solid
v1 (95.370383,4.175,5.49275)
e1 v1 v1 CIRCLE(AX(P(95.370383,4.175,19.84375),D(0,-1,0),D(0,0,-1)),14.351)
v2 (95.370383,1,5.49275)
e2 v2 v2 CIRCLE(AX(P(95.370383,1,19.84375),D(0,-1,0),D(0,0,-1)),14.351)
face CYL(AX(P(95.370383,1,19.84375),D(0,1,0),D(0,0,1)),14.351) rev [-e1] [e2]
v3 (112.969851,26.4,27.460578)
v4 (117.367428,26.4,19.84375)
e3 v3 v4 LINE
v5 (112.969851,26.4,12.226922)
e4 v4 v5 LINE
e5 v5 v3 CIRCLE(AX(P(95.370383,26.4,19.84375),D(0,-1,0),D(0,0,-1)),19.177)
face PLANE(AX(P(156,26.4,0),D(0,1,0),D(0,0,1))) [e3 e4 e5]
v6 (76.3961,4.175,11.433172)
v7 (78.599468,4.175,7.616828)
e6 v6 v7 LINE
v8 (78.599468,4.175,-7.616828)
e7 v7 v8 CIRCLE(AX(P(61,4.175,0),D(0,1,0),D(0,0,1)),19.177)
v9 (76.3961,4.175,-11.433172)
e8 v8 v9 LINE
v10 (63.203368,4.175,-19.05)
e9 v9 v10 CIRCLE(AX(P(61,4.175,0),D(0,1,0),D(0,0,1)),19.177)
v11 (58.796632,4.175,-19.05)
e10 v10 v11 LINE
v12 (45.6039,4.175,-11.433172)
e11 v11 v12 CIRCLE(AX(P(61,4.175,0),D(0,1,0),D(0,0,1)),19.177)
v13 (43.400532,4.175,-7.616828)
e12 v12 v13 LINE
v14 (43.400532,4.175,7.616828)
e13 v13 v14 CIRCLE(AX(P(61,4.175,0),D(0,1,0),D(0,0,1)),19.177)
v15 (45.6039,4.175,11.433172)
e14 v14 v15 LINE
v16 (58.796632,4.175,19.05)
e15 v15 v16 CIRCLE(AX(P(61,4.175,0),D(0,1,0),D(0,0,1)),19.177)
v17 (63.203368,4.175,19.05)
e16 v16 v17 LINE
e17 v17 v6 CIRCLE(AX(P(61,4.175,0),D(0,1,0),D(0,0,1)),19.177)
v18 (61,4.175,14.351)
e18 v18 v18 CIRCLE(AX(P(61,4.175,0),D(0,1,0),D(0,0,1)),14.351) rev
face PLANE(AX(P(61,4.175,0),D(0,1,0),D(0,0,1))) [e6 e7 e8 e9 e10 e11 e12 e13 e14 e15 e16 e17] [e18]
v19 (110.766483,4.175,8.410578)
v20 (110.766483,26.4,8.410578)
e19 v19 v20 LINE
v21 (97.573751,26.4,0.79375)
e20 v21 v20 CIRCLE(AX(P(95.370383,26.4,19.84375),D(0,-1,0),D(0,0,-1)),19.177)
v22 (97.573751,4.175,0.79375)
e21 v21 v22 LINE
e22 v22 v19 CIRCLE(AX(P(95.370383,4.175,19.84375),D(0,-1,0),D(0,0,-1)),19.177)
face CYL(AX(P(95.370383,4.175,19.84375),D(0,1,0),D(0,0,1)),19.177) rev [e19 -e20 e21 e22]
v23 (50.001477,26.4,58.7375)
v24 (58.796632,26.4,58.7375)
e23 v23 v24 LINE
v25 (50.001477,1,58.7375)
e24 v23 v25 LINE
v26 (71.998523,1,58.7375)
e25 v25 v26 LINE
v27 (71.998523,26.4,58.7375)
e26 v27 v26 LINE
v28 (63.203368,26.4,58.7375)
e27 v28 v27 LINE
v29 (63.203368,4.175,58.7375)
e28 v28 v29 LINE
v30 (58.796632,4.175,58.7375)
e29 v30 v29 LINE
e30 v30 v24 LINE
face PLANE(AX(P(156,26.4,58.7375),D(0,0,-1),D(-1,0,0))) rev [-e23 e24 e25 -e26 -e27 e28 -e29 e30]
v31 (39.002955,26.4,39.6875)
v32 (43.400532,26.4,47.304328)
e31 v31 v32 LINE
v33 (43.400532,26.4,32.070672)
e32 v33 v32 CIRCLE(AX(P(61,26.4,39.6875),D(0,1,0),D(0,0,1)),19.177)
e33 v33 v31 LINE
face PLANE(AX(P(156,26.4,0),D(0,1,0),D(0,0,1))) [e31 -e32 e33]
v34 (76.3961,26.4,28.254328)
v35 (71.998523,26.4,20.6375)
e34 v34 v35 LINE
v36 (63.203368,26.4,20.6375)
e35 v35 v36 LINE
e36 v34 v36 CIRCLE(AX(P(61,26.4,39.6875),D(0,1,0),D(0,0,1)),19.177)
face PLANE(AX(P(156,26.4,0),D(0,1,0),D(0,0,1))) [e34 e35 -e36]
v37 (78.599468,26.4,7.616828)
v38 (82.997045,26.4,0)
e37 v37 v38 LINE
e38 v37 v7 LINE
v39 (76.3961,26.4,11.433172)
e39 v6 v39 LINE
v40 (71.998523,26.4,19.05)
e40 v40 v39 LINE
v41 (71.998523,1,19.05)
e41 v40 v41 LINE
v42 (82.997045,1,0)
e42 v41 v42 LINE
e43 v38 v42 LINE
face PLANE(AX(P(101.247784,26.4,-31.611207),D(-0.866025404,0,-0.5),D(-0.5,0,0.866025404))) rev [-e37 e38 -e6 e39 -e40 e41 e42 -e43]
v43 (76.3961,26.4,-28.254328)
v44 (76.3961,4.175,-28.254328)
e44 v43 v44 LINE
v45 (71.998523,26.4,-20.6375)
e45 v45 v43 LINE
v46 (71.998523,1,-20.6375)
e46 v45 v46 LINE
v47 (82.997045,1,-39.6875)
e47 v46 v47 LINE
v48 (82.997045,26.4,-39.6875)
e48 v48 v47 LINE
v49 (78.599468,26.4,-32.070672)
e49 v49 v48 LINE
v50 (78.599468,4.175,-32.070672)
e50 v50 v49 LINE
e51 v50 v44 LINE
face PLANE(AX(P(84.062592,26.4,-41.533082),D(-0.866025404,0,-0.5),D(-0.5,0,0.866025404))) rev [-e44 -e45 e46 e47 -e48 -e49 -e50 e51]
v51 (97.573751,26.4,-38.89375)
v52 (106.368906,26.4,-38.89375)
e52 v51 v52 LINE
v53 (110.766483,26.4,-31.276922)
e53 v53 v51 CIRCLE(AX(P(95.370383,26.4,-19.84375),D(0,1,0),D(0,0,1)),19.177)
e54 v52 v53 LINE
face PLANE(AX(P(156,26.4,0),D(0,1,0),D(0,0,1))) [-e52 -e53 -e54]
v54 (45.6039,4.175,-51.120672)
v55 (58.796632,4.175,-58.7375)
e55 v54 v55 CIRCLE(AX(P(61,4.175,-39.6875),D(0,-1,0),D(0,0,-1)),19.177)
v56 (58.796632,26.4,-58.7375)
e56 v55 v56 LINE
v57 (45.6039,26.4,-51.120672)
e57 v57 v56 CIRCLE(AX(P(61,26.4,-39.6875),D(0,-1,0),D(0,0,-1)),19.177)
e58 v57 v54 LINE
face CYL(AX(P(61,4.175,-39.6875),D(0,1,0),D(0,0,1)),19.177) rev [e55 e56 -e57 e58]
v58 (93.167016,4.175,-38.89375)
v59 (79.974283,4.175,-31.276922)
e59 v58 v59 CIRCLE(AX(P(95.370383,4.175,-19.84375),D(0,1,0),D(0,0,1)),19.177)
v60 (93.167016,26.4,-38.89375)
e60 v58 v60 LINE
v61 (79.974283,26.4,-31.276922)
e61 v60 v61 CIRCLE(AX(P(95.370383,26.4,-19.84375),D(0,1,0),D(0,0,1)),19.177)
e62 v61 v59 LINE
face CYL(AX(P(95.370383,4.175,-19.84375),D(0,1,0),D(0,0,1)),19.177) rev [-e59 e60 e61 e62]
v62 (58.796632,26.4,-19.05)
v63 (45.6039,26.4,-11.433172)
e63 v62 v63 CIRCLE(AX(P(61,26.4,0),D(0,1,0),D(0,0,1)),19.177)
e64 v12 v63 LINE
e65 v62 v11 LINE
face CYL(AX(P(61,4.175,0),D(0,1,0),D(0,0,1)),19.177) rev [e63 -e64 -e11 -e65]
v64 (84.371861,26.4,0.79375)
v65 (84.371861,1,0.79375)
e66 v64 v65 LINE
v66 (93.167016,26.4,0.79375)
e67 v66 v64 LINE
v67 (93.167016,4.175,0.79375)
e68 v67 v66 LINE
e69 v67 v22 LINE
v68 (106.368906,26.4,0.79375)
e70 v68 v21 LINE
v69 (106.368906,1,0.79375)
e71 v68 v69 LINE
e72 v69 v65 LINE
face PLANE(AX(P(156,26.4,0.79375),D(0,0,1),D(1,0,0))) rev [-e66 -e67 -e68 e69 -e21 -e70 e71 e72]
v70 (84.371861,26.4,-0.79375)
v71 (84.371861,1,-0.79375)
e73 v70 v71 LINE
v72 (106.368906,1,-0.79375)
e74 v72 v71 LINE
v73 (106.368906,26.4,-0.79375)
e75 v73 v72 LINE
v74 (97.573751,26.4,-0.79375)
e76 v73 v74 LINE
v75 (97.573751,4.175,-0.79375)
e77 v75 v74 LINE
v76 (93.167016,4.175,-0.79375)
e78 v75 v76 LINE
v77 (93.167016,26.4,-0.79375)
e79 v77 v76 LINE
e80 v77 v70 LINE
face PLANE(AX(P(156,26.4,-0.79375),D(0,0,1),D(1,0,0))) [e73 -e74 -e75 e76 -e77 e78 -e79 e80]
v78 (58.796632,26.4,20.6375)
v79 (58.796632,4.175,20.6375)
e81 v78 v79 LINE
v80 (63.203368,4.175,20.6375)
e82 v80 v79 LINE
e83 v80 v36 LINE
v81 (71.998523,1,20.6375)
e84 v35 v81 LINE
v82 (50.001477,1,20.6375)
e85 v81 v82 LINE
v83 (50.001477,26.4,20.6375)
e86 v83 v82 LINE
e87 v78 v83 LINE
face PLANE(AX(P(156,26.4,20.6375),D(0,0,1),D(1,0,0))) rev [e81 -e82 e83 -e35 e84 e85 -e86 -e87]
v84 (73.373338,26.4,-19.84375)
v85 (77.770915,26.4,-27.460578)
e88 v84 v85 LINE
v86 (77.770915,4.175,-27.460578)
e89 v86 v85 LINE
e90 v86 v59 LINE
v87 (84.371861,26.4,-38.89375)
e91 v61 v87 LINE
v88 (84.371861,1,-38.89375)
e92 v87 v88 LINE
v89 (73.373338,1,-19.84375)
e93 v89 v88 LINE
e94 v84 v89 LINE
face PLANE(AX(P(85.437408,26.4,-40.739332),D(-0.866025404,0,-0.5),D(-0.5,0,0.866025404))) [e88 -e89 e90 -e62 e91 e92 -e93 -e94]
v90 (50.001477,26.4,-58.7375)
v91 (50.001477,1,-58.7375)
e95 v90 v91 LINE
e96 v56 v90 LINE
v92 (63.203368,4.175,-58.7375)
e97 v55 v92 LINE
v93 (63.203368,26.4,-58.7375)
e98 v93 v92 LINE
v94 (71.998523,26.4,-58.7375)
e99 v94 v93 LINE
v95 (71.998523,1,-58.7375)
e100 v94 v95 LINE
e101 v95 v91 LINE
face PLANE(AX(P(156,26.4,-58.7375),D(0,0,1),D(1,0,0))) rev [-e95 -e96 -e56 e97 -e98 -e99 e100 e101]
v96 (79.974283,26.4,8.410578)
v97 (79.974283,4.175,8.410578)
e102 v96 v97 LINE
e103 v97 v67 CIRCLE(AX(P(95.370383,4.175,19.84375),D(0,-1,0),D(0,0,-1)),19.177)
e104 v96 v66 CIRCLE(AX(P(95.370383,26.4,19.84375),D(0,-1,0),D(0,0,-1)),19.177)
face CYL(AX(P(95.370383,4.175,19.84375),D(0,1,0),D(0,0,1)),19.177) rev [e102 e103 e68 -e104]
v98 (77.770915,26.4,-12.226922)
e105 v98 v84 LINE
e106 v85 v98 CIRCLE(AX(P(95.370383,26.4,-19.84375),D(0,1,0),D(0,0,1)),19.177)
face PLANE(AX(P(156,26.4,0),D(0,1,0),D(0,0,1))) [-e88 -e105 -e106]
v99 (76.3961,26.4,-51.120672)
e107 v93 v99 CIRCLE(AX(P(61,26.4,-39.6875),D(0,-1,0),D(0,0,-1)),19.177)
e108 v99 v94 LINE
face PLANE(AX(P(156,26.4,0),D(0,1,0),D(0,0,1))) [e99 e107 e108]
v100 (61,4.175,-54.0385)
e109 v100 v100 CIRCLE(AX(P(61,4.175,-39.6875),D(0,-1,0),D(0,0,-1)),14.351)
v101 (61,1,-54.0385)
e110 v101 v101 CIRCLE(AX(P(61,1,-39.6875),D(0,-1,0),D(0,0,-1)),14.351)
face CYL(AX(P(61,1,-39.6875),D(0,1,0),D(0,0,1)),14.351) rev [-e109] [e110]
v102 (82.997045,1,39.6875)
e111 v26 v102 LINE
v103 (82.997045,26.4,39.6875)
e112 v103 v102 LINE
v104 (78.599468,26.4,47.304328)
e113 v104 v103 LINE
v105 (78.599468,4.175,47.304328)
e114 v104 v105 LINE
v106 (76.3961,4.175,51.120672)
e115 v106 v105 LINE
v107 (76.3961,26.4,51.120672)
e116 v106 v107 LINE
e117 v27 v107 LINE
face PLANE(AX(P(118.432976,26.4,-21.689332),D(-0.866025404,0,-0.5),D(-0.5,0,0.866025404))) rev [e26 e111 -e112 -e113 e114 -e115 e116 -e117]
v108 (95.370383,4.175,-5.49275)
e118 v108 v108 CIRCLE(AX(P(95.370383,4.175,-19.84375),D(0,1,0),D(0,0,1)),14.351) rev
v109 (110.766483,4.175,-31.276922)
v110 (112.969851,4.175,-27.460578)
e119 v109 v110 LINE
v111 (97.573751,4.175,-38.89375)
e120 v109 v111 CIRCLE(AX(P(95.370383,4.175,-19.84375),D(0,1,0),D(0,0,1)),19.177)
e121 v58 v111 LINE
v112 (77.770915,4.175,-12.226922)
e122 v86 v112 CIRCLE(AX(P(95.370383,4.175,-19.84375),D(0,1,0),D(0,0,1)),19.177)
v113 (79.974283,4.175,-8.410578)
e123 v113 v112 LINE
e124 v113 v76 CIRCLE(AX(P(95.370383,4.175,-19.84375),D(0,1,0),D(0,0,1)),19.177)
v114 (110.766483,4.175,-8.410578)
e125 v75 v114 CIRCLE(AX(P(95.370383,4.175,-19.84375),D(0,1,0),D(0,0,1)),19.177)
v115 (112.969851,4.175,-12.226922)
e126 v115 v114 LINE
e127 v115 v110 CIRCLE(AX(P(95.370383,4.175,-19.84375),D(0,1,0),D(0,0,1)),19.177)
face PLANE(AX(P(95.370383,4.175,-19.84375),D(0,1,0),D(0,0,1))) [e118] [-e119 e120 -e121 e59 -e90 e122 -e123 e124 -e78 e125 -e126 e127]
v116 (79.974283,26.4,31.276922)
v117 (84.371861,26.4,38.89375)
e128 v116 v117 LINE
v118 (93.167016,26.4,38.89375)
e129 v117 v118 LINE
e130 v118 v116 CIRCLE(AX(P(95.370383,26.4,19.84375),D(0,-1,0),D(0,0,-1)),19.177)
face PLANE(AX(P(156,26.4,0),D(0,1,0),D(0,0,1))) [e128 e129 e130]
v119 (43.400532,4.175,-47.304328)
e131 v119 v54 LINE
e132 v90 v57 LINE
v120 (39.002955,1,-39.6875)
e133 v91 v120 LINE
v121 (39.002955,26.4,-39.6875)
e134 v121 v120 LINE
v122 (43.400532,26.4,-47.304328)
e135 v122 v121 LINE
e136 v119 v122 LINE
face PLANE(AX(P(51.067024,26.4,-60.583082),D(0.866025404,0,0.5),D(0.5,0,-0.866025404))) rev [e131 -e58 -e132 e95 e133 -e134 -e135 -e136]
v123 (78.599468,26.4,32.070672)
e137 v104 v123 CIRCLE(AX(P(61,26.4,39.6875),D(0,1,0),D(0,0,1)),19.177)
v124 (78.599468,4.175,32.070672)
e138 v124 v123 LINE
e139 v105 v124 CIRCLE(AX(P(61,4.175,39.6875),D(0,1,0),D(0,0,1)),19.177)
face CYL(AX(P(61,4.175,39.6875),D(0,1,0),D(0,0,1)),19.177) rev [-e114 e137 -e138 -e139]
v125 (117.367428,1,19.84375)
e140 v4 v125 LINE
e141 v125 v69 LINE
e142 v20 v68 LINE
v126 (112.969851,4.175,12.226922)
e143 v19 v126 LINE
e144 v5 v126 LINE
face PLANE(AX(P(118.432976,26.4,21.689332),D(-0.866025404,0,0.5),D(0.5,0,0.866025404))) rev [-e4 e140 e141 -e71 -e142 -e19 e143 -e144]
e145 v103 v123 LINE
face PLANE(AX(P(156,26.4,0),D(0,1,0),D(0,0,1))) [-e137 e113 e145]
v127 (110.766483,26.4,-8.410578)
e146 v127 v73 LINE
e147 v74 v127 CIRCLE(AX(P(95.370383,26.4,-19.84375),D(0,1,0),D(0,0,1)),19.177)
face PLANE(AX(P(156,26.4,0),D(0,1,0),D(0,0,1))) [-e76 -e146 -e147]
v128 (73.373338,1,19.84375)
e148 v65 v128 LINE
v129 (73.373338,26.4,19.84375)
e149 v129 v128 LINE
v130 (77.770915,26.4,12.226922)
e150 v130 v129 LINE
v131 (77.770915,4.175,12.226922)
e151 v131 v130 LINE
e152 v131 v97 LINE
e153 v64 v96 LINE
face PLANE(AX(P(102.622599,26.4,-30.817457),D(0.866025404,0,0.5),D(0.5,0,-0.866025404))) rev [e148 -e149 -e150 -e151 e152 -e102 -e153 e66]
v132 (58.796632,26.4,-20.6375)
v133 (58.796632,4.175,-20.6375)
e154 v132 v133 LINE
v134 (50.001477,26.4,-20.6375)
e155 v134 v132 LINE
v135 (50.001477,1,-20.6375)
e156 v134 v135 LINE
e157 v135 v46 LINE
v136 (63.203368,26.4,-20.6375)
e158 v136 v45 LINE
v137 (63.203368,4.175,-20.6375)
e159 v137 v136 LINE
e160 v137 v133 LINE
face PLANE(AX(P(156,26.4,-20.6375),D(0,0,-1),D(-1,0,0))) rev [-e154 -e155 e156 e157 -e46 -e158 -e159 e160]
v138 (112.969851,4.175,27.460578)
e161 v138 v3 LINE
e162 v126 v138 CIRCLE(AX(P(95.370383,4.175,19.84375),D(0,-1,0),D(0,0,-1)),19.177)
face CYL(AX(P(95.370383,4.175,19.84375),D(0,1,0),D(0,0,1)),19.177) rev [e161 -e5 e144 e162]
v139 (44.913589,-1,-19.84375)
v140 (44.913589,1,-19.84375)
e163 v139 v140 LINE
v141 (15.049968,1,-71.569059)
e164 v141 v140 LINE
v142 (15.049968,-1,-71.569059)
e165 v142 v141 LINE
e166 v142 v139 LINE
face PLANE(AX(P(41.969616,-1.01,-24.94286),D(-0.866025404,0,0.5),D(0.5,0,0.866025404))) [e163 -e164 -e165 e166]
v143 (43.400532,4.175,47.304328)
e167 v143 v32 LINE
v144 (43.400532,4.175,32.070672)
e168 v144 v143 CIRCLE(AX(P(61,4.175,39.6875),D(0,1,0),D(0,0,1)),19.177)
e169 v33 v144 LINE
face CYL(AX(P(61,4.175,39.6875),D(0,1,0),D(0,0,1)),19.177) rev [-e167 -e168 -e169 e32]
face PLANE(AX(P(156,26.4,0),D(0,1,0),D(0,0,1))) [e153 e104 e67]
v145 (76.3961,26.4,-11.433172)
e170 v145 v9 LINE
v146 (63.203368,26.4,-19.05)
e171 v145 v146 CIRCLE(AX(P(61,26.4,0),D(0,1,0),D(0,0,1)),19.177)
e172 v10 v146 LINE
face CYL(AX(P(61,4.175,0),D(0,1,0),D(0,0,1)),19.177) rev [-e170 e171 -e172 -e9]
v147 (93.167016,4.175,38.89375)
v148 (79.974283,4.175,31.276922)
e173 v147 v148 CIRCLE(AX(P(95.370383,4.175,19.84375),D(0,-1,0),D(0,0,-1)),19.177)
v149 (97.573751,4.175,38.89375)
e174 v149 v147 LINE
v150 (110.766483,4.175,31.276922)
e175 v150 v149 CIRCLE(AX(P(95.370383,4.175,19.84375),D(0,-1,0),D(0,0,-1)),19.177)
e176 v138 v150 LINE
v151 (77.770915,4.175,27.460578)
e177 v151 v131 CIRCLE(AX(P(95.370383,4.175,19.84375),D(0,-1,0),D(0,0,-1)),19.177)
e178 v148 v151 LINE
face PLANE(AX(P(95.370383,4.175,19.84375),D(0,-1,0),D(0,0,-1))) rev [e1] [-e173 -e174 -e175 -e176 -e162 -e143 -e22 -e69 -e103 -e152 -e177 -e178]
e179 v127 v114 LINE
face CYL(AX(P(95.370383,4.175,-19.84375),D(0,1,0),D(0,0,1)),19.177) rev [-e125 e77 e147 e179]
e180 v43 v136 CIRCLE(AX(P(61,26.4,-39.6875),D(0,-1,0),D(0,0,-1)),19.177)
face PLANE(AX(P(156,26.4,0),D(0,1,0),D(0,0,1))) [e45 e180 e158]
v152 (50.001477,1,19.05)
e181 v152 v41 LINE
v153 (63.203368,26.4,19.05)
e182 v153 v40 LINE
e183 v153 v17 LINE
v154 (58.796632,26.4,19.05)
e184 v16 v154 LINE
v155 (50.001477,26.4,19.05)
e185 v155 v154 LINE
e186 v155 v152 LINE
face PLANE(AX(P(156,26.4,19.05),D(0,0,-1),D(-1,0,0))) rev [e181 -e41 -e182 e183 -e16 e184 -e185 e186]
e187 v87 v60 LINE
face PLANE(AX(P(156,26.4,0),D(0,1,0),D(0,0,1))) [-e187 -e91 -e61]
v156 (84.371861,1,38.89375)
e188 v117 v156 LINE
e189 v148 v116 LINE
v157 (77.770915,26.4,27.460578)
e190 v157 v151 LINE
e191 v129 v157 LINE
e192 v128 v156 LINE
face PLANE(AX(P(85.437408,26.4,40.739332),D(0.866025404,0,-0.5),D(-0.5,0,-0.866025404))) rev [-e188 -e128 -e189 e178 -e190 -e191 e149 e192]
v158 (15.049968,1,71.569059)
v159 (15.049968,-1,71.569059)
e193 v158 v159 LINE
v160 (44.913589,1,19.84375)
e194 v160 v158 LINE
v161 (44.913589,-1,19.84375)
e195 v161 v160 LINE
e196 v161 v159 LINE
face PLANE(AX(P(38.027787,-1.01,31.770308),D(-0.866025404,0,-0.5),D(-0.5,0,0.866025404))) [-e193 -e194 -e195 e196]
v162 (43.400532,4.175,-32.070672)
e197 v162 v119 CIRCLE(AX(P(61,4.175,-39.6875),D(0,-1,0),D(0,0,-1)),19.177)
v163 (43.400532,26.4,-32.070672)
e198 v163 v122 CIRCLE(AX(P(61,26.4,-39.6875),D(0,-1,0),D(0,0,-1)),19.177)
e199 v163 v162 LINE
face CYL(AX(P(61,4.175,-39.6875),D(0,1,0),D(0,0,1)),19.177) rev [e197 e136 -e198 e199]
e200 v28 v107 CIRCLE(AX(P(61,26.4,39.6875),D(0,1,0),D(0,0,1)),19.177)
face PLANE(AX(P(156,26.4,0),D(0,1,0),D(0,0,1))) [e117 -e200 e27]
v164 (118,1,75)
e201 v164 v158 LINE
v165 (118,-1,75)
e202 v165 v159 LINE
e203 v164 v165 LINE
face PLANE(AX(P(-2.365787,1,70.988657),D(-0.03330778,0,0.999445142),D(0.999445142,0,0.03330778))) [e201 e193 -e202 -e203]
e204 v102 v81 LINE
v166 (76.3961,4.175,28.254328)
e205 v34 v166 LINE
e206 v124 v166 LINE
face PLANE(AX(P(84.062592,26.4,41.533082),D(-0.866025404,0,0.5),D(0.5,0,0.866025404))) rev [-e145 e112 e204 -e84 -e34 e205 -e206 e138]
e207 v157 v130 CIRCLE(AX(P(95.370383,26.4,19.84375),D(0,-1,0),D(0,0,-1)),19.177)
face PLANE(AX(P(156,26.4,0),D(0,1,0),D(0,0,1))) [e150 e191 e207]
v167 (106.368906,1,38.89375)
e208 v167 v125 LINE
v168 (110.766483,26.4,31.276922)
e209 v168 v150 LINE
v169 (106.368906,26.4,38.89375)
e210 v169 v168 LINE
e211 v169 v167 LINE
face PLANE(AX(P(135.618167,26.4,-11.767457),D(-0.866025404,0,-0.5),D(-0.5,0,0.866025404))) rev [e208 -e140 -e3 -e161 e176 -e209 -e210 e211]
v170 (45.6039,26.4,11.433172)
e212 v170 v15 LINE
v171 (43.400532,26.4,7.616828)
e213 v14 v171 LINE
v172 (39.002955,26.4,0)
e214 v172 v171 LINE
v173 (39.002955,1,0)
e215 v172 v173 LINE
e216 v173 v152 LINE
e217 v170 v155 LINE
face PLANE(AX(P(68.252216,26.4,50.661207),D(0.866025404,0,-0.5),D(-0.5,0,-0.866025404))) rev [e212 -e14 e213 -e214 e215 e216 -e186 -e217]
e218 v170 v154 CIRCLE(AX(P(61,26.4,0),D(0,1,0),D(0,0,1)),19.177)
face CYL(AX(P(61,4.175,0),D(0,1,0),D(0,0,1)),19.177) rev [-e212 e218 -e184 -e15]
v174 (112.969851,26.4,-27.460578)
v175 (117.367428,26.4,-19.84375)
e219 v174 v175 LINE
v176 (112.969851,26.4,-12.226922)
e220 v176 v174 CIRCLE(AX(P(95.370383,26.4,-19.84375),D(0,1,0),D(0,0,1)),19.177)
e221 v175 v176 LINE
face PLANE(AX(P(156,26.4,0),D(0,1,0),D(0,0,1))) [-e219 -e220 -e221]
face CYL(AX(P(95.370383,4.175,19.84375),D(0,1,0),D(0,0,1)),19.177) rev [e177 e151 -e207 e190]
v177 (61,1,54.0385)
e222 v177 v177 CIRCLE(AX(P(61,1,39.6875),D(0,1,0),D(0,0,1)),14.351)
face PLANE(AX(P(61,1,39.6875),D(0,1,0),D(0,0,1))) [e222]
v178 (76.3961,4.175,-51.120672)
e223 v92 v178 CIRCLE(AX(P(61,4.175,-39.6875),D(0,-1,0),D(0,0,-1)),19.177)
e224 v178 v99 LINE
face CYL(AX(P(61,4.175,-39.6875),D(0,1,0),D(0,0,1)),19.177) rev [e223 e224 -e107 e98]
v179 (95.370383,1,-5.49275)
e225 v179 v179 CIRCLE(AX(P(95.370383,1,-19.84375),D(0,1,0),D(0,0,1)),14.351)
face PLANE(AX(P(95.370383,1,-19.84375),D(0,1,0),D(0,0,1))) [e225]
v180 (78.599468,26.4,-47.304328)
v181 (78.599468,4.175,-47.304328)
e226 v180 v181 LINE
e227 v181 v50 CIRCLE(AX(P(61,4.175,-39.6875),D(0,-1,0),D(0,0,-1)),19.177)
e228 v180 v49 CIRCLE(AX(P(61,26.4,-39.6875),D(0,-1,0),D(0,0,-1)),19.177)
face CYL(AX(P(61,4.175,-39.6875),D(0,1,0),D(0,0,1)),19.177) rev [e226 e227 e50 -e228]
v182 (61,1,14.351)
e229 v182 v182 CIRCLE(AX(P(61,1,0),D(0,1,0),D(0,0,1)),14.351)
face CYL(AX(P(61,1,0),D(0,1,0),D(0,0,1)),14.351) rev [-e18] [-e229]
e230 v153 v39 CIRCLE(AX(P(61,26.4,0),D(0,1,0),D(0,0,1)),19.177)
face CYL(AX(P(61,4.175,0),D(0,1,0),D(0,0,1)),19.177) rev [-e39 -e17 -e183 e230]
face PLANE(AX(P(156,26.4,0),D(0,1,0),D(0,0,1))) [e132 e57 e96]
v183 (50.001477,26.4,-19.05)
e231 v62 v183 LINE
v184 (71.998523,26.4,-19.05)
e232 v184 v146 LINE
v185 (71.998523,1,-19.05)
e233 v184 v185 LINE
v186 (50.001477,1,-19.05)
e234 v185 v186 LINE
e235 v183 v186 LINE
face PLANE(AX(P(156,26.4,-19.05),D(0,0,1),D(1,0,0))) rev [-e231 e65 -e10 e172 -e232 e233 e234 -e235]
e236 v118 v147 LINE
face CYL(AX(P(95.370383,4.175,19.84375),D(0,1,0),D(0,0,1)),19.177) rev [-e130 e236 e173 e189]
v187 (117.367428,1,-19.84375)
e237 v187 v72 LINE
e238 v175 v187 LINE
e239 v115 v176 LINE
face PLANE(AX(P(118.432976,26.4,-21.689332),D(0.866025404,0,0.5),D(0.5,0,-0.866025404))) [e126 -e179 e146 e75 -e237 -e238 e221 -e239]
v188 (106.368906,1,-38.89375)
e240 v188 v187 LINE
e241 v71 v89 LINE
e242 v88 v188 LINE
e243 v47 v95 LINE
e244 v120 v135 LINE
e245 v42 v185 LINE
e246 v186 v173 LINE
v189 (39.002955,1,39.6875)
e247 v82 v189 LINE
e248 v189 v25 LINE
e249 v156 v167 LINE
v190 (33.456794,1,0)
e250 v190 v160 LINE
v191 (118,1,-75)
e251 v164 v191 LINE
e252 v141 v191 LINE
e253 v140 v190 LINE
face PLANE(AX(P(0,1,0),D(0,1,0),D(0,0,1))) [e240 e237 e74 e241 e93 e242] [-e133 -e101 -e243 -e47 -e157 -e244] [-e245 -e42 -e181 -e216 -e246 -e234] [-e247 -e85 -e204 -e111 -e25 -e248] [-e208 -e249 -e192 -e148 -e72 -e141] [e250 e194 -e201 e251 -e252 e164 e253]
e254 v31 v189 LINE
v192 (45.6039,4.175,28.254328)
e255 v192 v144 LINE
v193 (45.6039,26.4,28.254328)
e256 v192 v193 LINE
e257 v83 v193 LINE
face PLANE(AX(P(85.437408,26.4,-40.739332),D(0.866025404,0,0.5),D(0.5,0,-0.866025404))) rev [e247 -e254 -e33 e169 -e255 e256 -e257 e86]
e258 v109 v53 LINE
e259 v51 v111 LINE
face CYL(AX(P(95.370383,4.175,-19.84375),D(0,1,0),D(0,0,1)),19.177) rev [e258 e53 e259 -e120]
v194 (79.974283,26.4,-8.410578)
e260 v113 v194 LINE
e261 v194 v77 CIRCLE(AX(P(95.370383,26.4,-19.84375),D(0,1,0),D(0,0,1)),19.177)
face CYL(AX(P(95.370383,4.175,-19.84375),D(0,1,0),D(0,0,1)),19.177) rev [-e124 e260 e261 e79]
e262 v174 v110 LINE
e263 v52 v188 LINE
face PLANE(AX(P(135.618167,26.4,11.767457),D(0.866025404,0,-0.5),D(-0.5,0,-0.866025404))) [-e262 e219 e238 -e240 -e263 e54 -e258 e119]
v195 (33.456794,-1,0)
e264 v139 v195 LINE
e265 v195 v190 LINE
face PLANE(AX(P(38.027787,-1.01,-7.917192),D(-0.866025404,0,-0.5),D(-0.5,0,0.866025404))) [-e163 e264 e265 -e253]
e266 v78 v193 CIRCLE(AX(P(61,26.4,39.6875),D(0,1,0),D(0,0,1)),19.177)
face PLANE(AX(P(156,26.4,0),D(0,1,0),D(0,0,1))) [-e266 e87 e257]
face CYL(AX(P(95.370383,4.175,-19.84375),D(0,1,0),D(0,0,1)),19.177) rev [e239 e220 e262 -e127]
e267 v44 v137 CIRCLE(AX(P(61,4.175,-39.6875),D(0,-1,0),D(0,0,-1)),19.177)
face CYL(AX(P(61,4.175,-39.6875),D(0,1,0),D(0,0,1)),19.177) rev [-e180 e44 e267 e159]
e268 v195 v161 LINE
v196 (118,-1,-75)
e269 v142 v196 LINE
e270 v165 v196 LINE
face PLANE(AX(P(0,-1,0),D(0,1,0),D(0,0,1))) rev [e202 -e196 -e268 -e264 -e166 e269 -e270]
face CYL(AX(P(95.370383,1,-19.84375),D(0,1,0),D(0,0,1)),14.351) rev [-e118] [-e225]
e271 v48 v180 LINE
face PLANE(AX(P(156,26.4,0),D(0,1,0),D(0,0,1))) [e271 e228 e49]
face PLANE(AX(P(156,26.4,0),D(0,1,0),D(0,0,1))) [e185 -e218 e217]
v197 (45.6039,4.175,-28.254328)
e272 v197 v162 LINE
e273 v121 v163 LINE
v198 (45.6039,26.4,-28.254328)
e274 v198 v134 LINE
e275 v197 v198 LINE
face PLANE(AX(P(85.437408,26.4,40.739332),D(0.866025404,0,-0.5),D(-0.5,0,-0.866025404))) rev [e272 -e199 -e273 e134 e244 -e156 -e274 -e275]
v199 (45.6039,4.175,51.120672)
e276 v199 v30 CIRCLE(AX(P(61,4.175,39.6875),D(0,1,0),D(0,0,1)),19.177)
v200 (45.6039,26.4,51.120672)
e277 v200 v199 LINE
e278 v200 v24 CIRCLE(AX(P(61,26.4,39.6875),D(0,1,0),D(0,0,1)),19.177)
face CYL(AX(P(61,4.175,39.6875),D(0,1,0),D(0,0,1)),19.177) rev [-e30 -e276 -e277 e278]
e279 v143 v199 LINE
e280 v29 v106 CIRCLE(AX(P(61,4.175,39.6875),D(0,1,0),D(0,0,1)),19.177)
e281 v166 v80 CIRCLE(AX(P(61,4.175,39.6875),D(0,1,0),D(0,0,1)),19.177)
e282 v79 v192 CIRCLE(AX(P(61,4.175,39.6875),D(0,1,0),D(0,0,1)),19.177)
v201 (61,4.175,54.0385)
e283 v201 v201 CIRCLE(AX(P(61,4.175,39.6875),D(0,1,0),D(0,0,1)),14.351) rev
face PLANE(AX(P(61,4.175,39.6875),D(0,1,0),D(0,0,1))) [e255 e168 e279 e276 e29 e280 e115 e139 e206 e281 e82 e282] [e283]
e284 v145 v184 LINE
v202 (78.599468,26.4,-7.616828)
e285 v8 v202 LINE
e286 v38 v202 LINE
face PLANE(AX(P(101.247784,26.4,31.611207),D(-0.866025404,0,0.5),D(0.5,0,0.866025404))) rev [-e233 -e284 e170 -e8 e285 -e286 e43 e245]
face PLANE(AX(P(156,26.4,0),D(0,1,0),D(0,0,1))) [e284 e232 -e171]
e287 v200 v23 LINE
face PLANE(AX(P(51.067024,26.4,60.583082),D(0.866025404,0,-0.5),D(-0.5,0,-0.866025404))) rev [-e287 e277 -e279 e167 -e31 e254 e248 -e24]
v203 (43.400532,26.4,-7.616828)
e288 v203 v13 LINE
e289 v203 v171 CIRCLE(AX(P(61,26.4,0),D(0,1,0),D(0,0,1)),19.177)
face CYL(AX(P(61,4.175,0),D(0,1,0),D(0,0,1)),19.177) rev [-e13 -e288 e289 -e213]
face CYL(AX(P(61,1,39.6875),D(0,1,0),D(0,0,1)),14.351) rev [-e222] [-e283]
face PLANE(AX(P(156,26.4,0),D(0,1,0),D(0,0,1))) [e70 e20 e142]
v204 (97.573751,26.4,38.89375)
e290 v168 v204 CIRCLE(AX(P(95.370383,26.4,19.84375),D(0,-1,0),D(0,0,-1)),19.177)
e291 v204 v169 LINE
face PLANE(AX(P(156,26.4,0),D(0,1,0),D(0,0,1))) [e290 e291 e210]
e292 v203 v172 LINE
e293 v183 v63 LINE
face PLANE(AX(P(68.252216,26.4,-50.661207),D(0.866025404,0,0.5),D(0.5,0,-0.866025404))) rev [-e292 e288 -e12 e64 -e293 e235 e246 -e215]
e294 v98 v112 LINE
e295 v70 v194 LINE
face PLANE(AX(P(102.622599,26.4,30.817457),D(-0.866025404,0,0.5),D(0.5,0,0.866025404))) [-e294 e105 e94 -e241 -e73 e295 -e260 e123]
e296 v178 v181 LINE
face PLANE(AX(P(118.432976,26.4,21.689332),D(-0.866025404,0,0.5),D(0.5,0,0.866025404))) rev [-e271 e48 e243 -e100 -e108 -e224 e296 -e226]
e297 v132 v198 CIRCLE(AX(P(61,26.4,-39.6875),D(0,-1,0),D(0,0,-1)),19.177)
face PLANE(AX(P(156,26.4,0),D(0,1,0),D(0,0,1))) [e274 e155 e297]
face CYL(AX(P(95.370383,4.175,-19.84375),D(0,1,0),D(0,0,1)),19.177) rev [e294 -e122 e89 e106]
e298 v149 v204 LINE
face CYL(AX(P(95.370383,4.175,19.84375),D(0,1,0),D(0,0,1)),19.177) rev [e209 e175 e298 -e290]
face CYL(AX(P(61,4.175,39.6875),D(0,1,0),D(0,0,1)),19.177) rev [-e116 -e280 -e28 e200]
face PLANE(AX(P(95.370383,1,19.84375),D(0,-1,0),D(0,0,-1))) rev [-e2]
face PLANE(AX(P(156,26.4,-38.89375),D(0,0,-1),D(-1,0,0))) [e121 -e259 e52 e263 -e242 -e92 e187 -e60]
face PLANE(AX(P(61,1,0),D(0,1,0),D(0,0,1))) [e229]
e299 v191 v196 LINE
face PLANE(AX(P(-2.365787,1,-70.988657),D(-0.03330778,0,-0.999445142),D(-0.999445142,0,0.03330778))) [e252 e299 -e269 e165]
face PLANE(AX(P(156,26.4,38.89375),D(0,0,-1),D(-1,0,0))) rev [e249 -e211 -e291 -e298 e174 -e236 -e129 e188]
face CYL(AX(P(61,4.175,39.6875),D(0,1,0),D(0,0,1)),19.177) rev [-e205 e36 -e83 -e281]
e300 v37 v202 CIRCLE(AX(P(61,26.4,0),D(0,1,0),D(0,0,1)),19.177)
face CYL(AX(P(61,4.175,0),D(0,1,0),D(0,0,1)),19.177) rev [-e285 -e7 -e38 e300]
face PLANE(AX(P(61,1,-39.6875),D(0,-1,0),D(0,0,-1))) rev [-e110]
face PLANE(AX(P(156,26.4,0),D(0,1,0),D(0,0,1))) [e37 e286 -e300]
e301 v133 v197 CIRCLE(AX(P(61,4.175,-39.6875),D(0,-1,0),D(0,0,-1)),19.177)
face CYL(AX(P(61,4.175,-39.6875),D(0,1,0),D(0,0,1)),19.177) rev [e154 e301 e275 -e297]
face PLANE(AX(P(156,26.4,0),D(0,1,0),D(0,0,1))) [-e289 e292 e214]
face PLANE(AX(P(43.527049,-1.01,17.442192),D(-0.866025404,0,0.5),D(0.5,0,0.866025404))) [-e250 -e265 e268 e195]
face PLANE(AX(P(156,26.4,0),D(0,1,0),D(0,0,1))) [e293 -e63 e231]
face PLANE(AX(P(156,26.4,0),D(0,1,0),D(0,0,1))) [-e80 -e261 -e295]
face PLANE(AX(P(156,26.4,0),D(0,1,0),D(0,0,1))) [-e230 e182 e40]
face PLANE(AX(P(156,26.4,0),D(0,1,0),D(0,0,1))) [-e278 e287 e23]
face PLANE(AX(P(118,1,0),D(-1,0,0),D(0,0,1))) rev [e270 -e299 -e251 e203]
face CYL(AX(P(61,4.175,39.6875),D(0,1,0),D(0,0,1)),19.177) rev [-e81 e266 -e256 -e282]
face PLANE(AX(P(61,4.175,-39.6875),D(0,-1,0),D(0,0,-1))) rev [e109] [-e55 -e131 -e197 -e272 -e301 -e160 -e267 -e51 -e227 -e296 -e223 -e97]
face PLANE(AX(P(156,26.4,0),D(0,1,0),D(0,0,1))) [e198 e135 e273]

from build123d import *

# Parameters (mm, degrees)
BOSS_EXTRUDE1_DEPTH = 1
BOSS_EXTRUDE2_DEPTH = 25.4
SKETCH4_R           = 14.351
CUT_EXTRUDE1_DEPTH  = 25.4
SKETCH4_4_R         = 19.177
CUT_EXTRUDE2_DEPTH  = 22.225
LPATTERN1_COUNT     = 3
LPATTERN1_PITCH     = 78
SPLIT3_START        = -1
SPLIT3_DEPTH        = 27.4


# Read off the part's stored shape, not the designer's step: Split3
with BuildPart() as part:
    # Sketch1 → Boss-Extrude1 (new, symmetric)
    with BuildSketch(Plane(origin=(0, 0, 0), x_dir=(1, 0, 0), z_dir=(0, 1, 0))):
        Polygon((118, 0), (-118, 0), (-118, -67.135), (118, -75), align=None)
        Polygon((-118, 67.135), (-118, 0), (118, 0), (118, 75), align=None)
    extrude(amount=BOSS_EXTRUDE1_DEPTH, both=True)

    # Sketch3 → Boss-Extrude2 (add)
    with BuildSketch(Plane(origin=(0, 1, 0), x_dir=(1, 0, 0), z_dir=(0, 1, 0))):
        Polygon((-84.001477372, 20.6375), (-73.002954744, 39.6875), (-84.001477372, 58.7375), (-105.998522628, 58.7375), (-116.997045256, 39.6875), (-105.998522628, 20.6375), align=None)
        Polygon((-38.632571531, 19.84375), (-49.631094159, 0.79375), (-71.628139415, 0.79375), (-82.626662043, 19.84375), (-71.628139415, 38.89375), (-49.631094159, 38.89375), align=None)
        Polygon((-84.001477372, -19.05), (-73.002954744, 0), (-84.001477372, 19.05), (-105.998522628, 19.05), (-116.997045256, 0), (-105.998522628, -19.05), align=None)
        Polygon((-105.998522628, -58.7375), (-84.001477372, -58.7375), (-73.002954744, -39.6875), (-84.001477372, -20.6375), (-105.998522628, -20.6375), (-116.997045256, -39.6875), align=None)
        Polygon((-71.628139415, -38.89375), (-49.631094159, -38.89375), (-38.632571531, -19.84375), (-49.631094159, -0.79375), (-71.628139415, -0.79375), (-82.626662043, -19.84375), align=None)
    boss_extrude2 = extrude(amount=BOSS_EXTRUDE2_DEPTH)

    # Sketch4 → Cut-Extrude1 (cut)
    with BuildSketch(Plane(origin=(0, 26.4, 0), x_dir=(1, 0, 0), z_dir=(0, 1, 0))):
        with Locations(Location((-95, 0, 0), (0, 0, 270))):
            Circle(SKETCH4_R)
        with Locations(Location((-95, -39.6875, 0), (0, 0, 270))):
            Circle(SKETCH4_R)
        with Locations(Location((-95, 39.6875, 0), (0, 0, 90))):
            Circle(SKETCH4_R)
        with Locations(Location((-60.629616787, 19.84375, 0), (0, 0, 270))):
            Circle(SKETCH4_R)
        with Locations(Location((-60.629616787, -19.84375, 0), (0, 0, 90))):
            Circle(SKETCH4_R)
    cut_extrude1 = extrude(amount=-CUT_EXTRUDE1_DEPTH, mode=Mode.SUBTRACT)

    # Sketch4<4> → Cut-Extrude2 (cut)
    with BuildSketch(Plane(origin=(0, 26.4, 0), x_dir=(1, 0, 0), z_dir=(0, 1, 0))):
        with Locations((-95, 0)):
            Circle(SKETCH4_4_R)
        with Locations((-95, -39.6875)):
            Circle(SKETCH4_4_R)
        with Locations((-95, 39.6875)):
            Circle(SKETCH4_4_R)
        with Locations((-60.629616787, 19.84375)):
            Circle(SKETCH4_4_R)
        with Locations((-60.629616787, -19.84375)):
            Circle(SKETCH4_4_R)
    cut_extrude2 = extrude(amount=-CUT_EXTRUDE2_DEPTH, mode=Mode.SUBTRACT)

    # LPattern1: Boss-Extrude2, Cut-Extrude1, Cut-Extrude2 ×3
    with Locations(*[(i * LPATTERN1_PITCH, 0, 0) for i in range(1, LPATTERN1_COUNT)]):
        add(boss_extrude2)
        add(cut_extrude1, mode=Mode.SUBTRACT)
        add(cut_extrude2, mode=Mode.SUBTRACT)

    # Split3 outline → Split3 (cut)
    with BuildSketch(Plane(origin=(0, 0, 0), x_dir=(1, 0, 0), z_dir=(0, 1, 0)).offset(SPLIT3_START)):
        Polygon((15.04996756, -71.5690593), (44.913588808, -19.84375), (33.456794404, 0), (44.913588808, 19.84375), (15.04996756, 71.5690593), (-118, 67.135), (-118, -67.135), align=None)
    extrude(amount=SPLIT3_DEPTH, mode=Mode.SUBTRACT)


solid = part.part
